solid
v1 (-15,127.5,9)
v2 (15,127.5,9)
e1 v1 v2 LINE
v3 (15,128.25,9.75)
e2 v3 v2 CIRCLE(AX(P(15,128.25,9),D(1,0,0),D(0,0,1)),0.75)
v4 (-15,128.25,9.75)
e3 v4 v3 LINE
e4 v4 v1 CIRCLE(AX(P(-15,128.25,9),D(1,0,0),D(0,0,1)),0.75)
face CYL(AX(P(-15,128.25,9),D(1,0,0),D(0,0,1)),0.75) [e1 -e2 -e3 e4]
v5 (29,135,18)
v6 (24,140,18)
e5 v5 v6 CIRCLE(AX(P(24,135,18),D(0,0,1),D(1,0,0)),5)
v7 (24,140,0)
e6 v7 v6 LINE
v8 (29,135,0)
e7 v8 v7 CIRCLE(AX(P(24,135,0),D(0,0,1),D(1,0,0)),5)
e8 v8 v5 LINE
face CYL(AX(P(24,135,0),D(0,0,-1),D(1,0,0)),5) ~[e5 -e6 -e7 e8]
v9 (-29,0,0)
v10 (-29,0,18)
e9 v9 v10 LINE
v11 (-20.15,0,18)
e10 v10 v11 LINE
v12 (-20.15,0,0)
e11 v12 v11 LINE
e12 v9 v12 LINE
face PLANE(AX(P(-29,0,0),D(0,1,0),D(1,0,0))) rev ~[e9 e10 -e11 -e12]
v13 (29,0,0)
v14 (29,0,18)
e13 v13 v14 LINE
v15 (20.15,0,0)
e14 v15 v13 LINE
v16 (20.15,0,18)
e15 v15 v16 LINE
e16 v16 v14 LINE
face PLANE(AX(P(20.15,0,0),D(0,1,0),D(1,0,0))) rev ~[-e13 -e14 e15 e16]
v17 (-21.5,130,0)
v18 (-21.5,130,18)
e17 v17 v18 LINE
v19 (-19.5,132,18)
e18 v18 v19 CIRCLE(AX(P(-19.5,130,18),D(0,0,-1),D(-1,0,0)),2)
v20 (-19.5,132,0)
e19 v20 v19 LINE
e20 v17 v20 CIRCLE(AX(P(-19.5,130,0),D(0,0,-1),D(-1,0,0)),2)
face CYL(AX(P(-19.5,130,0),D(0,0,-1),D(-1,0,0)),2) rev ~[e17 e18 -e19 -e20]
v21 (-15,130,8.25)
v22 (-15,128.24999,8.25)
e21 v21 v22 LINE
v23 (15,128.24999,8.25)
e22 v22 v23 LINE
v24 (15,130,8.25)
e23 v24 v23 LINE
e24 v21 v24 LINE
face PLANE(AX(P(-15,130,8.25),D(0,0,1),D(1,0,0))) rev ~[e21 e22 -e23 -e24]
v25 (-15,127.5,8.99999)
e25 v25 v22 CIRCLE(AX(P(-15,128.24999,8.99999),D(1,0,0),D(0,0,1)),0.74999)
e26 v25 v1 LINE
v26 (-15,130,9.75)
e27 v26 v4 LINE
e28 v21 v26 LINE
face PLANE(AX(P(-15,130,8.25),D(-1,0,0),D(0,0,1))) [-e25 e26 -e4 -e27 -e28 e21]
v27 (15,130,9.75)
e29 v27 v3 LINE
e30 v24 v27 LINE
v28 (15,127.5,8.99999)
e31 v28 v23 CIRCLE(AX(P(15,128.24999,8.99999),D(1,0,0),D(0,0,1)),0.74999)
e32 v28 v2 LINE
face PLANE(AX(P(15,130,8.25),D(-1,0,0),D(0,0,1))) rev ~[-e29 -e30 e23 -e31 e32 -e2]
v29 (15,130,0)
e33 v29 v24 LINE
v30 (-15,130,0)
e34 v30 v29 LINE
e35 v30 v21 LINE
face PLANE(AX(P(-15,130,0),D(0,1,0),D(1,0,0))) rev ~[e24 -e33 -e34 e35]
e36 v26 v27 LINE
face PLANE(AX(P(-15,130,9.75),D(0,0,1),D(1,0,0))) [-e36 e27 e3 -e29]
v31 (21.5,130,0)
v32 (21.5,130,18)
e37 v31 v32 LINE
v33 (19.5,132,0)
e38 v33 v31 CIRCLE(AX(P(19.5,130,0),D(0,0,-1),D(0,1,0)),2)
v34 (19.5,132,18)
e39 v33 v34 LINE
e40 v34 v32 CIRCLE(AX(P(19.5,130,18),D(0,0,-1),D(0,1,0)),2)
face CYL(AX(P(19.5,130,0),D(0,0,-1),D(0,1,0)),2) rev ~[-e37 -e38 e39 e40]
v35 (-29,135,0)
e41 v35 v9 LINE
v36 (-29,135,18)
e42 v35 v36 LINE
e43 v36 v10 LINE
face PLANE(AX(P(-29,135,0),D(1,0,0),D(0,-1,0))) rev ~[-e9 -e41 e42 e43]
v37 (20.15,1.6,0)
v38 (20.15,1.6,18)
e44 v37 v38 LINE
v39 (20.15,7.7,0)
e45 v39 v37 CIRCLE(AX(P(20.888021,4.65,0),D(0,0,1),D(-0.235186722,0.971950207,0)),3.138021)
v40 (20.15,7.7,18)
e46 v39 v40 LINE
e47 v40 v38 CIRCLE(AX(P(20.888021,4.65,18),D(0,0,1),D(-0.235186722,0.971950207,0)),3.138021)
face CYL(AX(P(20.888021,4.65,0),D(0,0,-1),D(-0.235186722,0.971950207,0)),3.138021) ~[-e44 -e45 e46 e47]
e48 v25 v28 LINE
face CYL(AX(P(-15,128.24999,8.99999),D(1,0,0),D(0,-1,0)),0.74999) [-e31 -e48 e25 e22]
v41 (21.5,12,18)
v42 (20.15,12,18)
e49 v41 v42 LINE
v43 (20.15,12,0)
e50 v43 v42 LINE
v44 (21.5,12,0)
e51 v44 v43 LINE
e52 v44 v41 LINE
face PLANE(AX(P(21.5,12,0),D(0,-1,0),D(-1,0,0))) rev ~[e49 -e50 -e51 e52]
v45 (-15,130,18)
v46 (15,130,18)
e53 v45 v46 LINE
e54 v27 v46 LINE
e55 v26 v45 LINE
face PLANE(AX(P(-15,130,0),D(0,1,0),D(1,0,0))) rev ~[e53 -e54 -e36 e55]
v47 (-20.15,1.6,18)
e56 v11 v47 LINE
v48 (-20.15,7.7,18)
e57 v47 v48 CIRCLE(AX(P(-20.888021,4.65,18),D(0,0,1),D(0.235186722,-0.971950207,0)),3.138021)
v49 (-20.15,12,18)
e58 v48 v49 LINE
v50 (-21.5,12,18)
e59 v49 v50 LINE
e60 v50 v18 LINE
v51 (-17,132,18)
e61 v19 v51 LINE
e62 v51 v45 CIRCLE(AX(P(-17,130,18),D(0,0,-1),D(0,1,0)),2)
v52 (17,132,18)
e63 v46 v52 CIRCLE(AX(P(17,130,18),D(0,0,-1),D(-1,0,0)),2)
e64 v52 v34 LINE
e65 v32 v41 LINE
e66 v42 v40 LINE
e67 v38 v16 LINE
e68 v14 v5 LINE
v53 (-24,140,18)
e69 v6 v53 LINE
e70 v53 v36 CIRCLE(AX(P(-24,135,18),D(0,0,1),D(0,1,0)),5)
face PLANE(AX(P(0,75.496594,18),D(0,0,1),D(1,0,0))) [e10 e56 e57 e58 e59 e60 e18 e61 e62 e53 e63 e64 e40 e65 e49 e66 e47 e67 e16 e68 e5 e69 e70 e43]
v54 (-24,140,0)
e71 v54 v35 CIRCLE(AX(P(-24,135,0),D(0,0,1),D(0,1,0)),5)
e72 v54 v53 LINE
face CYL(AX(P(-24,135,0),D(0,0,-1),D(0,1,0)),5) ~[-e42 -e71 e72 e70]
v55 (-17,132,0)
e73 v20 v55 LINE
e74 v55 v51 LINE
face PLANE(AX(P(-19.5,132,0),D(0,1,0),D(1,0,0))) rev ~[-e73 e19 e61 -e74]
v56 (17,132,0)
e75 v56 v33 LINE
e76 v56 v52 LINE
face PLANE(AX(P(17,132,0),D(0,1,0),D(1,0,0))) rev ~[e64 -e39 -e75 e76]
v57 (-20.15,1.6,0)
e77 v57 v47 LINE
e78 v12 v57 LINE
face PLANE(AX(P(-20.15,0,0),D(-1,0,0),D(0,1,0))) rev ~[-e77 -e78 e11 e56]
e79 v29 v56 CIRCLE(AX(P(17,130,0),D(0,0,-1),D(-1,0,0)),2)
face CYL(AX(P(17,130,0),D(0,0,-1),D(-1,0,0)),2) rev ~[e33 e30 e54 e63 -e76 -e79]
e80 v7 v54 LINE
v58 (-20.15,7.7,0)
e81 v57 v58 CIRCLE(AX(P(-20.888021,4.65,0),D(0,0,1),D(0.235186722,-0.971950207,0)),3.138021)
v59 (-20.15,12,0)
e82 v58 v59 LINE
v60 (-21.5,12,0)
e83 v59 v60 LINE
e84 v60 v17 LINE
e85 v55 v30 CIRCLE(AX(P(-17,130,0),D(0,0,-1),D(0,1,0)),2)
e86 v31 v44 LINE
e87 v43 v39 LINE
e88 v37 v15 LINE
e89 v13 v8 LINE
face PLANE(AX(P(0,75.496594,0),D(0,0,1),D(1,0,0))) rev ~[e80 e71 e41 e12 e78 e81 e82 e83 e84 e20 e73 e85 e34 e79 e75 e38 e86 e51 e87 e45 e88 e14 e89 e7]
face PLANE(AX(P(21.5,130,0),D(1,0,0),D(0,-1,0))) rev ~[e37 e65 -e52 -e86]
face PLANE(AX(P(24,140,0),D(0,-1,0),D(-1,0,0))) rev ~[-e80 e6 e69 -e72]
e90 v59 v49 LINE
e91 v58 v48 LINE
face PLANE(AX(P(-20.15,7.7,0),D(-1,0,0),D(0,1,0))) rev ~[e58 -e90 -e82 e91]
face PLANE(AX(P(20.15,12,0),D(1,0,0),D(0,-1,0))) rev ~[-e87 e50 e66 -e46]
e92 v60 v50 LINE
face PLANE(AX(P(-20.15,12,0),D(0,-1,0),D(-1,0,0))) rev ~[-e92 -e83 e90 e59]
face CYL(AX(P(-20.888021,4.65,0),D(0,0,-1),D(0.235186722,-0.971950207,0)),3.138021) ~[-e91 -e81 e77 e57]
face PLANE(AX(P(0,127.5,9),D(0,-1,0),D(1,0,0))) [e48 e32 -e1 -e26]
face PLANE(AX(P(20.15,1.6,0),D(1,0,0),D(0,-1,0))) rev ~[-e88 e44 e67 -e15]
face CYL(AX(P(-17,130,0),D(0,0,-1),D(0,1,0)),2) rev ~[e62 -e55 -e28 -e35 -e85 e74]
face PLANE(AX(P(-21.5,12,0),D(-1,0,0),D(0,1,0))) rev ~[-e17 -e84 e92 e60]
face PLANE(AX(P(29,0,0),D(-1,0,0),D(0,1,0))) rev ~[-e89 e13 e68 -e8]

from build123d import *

# Parameters (mm, degrees)
F2_DEPTH = 18
F3_W     = 30
F3_H     = 1.5
F4_DEPTH = 2.5
F5_R     = 0.75
F6_R     = 0.74999


# Not quite as in the source:
# - a fillet or chamfer is up to 0.001 mm smaller than in the source, because OpenCascade refuses the exact size


with BuildPart() as f2:
    # F1 (on Top) → F2 (new body)
    with BuildSketch(Plane.XY):
        with BuildLine():
            Line((24, 140), (0, 140))
            Line((0, 140), (-24, 140))
            ThreePointArc((-24, 140), (-27.5355339059, 138.5355339059), (-29, 135))
            Line((-29, 135), (-29, 0))
            Line((-29, 0), (-20.15, 0))
            Line((-20.15, 0), (-20.15, 1.6))
            ThreePointArc((-20.15, 1.6), (-17.75, 4.65), (-20.15, 7.7))
            Line((-20.15, 7.7), (-20.15, 12))
            Line((-20.15, 12), (-21.5, 12))
            Line((-21.5, 12), (-21.5, 130))
            ThreePointArc((-21.5, 130), (-20.9142135624, 131.4142135624), (-19.5, 132))
            Line((-19.5, 132), (-17, 132))
            ThreePointArc((-17, 132), (-15.5857864376, 131.4142135624), (-15, 130))
            Line((-15, 130), (0, 130))
            Line((0, 130), (15, 130))
            ThreePointArc((15, 130), (15.5857864376, 131.4142135624), (17, 132))
            Line((17, 132), (19.5, 132))
            ThreePointArc((19.5, 132), (20.9142135624, 131.4142135624), (21.5, 130))
            Line((21.5, 130), (21.5, 12))
            Line((21.5, 12), (20.15, 12))
            Line((20.15, 12), (20.15, 7.7))
            ThreePointArc((20.15, 7.7), (17.75, 4.65), (20.15, 1.6))
            Line((20.15, 1.6), (20.15, 0))
            Line((20.15, 0), (29, 0))
            Line((29, 0), (29, 135))
            ThreePointArc((29, 135), (27.5355339059, 138.5355339059), (24, 140))
        make_face()
    extrude(amount=F2_DEPTH)

    # F3 (on face) → F4 (join)
    with BuildSketch(Plane.XZ.offset(-130)):
        with Locations((0, 9)):
            Rectangle(F3_W, F3_H)
    extrude(amount=F4_DEPTH)

    # F5
    f5_edges = [f2.edges().sort_by_distance(p)[0] for p in [
        (0, 127.5, 9.75),
    ]]
    fillet(f5_edges, radius=F5_R)

    # F6 (radius 0.75 in the source; OpenCascade refuses exactly that, so slightly less here)
    f6_edges = [f2.edges().sort_by_distance(p)[0] for p in [
        (0, 127.5, 8.25),
    ]]
    fillet(f6_edges, radius=F6_R)


solid = f2.part
